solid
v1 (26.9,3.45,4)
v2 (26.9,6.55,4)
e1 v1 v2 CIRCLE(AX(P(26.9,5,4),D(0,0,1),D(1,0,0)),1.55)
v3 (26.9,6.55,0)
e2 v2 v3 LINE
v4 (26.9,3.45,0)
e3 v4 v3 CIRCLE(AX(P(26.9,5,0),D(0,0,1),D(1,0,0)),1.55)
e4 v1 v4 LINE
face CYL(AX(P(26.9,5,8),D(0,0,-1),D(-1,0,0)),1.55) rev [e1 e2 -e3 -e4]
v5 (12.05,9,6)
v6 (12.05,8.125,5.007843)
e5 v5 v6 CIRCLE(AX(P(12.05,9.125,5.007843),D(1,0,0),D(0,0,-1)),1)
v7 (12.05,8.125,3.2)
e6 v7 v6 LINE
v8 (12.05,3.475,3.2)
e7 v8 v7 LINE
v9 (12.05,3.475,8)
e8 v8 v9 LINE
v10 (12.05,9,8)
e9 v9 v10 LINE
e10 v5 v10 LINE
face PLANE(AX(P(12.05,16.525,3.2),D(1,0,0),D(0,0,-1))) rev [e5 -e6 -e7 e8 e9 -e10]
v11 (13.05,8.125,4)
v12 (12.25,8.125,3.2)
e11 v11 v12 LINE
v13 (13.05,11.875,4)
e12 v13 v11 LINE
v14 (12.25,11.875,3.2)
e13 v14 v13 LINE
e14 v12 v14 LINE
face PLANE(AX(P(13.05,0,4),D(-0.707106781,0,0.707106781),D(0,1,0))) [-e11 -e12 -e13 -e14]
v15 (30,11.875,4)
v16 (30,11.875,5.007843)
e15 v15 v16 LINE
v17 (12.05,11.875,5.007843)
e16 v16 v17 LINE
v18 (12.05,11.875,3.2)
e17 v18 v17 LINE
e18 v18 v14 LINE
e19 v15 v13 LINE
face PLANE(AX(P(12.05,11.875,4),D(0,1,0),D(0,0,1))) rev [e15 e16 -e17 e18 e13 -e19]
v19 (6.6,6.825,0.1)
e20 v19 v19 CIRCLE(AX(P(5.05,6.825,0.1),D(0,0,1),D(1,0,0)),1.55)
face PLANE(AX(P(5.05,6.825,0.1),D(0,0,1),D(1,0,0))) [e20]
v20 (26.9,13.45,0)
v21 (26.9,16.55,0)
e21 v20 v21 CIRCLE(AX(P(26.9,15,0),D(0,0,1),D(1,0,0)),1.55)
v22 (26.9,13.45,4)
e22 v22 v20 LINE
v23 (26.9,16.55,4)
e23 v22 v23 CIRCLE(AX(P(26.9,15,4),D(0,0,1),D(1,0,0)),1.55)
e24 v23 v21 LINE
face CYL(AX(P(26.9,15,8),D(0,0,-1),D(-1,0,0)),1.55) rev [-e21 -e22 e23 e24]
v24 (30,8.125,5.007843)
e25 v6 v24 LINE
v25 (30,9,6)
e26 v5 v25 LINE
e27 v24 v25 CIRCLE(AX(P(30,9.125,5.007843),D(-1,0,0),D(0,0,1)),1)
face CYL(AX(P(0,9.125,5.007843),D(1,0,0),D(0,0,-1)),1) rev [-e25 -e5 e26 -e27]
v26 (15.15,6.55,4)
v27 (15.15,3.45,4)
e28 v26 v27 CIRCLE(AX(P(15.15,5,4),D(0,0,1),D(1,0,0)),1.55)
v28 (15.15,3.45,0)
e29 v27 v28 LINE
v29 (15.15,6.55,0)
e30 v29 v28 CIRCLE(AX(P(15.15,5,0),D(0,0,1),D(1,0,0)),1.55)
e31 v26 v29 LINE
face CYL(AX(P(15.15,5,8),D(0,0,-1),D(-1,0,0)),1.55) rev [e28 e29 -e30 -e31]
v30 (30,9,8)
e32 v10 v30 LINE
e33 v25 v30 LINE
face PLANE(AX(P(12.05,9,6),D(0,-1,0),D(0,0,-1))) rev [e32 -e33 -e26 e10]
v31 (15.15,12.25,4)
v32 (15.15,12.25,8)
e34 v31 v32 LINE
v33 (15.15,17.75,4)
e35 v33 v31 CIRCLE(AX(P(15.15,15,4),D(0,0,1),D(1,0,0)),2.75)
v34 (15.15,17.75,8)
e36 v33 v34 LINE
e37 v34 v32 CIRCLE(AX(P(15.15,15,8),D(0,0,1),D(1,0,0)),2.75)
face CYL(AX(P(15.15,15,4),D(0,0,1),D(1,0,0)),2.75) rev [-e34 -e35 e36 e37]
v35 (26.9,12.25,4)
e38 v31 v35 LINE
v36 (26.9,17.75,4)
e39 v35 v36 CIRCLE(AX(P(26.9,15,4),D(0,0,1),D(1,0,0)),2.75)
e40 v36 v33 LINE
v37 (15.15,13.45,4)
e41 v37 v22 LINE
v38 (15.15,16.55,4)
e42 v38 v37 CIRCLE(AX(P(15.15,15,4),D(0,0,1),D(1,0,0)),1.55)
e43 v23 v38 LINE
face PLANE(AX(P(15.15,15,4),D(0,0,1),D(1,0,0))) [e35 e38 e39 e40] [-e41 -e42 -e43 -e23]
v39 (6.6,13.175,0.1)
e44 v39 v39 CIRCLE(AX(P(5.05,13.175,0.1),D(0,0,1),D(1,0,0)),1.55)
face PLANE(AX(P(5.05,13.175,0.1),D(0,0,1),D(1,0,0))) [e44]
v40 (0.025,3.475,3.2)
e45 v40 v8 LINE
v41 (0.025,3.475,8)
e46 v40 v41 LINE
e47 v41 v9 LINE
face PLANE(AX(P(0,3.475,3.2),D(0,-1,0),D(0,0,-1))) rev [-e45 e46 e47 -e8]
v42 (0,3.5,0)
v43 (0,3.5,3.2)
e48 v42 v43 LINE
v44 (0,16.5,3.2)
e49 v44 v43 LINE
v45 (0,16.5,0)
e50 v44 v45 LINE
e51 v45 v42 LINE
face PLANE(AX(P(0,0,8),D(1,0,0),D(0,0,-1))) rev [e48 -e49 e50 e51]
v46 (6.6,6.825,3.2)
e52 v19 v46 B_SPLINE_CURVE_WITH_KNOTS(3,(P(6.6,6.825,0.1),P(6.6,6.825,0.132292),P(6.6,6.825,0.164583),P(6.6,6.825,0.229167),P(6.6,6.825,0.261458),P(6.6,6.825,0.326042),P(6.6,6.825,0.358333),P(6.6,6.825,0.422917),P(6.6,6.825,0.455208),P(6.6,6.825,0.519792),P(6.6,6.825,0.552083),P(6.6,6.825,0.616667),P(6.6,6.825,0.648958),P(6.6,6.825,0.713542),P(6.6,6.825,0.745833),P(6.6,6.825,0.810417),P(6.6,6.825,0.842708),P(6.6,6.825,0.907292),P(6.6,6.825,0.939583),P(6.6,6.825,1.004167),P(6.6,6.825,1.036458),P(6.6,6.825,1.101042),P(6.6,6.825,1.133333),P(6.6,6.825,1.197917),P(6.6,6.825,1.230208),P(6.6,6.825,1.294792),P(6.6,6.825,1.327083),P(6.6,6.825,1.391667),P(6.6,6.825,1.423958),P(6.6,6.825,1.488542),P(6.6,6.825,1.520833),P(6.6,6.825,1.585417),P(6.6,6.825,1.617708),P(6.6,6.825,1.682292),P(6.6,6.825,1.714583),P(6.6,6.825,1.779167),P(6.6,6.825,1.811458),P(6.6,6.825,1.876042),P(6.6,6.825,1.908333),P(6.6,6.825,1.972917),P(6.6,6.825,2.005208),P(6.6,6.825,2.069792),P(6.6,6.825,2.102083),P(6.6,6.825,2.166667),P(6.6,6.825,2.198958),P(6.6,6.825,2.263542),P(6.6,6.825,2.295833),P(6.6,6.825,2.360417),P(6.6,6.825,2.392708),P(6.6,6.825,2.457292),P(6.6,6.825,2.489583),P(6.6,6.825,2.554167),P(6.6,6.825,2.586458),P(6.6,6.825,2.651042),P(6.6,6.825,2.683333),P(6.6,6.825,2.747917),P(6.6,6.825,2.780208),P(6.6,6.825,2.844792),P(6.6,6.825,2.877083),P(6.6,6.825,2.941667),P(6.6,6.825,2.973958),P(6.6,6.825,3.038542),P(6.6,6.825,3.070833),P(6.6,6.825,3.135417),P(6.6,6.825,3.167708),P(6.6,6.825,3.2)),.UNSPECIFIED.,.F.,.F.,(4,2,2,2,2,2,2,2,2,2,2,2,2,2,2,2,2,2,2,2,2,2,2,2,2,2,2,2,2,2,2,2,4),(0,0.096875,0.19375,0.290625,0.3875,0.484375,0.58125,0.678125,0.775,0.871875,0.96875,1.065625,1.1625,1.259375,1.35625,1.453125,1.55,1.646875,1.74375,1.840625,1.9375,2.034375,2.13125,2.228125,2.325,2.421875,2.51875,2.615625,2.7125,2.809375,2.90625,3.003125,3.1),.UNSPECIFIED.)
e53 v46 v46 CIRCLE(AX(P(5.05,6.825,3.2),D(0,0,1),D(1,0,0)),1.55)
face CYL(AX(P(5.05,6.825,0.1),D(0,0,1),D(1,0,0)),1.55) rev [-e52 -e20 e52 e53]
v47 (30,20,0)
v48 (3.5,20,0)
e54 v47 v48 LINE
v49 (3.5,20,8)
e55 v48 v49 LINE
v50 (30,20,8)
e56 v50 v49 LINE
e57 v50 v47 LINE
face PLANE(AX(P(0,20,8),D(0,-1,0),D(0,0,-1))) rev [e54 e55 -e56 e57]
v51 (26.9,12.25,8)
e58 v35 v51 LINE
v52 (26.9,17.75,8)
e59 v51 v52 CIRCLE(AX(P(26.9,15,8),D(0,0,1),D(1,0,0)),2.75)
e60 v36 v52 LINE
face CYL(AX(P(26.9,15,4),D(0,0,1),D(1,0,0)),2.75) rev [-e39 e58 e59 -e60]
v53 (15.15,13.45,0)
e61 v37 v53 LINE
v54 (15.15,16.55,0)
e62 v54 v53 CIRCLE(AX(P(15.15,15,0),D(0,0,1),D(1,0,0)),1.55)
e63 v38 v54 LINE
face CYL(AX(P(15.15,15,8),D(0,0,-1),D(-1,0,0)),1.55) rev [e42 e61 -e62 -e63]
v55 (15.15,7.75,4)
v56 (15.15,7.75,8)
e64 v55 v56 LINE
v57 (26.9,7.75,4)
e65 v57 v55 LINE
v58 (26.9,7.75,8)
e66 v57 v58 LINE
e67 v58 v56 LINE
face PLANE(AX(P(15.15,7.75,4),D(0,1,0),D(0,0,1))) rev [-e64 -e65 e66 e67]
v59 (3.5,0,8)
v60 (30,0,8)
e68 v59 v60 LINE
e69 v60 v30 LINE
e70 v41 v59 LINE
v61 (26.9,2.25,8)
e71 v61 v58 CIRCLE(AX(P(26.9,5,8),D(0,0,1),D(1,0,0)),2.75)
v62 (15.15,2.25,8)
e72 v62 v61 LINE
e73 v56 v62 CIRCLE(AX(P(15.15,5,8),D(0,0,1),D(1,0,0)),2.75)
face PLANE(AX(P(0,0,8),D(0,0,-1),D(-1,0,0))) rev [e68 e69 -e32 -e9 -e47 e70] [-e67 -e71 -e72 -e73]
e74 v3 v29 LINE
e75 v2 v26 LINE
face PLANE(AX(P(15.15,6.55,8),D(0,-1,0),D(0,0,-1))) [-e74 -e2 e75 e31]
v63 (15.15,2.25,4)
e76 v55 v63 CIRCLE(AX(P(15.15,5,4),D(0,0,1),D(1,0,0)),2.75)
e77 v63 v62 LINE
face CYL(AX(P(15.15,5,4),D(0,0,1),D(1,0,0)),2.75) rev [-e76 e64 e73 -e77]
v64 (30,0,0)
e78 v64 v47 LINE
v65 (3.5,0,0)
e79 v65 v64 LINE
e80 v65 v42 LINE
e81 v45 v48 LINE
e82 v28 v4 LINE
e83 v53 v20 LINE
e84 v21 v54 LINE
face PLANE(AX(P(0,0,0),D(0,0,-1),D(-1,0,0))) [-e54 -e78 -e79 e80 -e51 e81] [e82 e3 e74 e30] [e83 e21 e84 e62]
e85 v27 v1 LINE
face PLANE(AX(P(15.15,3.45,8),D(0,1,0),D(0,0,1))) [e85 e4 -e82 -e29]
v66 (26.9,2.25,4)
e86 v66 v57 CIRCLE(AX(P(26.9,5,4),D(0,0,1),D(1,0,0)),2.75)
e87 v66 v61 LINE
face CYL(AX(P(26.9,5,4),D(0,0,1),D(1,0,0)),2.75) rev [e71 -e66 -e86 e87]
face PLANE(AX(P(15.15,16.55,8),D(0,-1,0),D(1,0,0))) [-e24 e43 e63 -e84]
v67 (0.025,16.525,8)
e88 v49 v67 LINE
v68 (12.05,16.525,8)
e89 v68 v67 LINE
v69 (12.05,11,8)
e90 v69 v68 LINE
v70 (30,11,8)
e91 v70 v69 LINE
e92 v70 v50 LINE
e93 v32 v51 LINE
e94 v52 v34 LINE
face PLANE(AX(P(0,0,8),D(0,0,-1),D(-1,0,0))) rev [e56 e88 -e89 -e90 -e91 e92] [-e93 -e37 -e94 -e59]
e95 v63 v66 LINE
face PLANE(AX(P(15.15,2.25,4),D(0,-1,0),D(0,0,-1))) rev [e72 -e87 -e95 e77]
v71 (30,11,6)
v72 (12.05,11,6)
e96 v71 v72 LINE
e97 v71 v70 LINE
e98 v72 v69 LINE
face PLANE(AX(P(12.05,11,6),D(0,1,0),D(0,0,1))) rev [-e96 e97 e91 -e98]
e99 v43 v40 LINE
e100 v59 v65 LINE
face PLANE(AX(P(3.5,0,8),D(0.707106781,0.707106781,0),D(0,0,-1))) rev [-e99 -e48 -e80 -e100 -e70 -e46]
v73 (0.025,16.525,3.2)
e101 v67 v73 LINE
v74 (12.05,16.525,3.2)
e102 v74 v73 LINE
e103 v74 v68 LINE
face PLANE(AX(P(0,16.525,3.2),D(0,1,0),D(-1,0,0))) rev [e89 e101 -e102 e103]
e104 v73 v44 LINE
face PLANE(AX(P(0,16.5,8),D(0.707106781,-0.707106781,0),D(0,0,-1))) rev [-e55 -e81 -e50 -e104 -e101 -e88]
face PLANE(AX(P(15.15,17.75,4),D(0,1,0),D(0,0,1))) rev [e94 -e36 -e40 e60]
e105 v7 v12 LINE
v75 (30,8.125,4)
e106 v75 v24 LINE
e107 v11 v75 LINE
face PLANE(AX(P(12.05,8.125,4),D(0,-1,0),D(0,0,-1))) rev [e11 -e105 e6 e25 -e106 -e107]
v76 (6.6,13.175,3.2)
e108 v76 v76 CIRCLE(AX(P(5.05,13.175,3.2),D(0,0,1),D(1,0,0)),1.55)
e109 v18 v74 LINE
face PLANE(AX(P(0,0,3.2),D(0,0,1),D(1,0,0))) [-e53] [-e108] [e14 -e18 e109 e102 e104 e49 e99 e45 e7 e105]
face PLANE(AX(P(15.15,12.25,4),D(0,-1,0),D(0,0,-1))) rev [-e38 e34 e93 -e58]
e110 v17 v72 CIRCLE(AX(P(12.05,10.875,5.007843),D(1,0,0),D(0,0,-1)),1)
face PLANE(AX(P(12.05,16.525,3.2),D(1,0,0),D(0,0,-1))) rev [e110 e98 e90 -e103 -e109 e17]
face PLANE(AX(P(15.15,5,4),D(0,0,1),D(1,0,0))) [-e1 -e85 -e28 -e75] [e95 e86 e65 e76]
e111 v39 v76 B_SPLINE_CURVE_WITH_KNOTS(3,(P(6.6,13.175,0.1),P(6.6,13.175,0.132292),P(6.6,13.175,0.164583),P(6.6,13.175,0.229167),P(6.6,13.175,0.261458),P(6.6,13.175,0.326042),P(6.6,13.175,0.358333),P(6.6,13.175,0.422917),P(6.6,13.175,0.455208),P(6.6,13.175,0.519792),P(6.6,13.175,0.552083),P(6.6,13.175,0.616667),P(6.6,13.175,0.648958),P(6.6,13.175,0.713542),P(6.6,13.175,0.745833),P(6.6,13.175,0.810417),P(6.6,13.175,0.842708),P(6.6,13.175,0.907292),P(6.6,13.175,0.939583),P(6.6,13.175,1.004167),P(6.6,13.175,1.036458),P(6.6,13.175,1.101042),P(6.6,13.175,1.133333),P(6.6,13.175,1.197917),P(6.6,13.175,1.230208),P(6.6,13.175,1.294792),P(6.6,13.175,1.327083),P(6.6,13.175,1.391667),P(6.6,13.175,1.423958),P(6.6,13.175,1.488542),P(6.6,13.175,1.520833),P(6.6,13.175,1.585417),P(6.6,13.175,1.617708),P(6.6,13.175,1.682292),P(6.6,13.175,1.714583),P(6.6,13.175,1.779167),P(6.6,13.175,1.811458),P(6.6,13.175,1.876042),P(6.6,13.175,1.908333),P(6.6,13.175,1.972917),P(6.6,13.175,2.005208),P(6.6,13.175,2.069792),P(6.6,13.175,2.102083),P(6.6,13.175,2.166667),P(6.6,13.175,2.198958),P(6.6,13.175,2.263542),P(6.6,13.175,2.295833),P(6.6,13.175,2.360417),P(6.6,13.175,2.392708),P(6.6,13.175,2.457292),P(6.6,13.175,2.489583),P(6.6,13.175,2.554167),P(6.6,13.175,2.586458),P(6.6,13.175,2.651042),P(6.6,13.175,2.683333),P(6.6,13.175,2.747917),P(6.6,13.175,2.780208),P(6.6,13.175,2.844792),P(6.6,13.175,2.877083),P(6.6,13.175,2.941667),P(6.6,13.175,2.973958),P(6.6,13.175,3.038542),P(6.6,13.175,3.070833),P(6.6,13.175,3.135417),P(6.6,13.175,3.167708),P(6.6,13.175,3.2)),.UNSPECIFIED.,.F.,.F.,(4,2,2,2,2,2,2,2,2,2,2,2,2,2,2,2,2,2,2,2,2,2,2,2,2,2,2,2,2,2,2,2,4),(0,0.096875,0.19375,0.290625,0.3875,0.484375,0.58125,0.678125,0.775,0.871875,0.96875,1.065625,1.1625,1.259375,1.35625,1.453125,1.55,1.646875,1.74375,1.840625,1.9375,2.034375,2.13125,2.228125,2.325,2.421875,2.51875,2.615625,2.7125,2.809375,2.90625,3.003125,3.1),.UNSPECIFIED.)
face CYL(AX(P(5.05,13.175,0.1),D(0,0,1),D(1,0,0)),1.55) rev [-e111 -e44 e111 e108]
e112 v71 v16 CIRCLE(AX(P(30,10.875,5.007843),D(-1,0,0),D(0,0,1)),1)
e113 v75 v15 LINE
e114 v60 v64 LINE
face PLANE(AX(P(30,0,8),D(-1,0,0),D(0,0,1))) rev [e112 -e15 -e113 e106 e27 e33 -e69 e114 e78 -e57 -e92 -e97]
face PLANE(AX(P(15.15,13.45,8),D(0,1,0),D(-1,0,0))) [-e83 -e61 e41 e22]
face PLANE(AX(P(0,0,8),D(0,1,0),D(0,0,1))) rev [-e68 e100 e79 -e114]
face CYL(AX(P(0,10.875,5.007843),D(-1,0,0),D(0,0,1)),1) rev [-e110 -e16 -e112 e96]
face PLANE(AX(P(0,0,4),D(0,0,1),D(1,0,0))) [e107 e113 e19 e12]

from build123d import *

# Parameters (mm, degrees)
PROFILESKETCH3_W                           = 30
PROFILESKETCH3_H                           = 20
PROFILEBOSS_EXTRUDE1_DEPTH                 = 8
MICROSWITCHCUTSKETCH4_W                    = 12.05
MICROSWITCHCUTSKETCH4_H                    = 13.05
MICROSWITCHCUT_EXTRUDE1_DEPTH              = 4.8
SKETCH5_R                                  = 1.55
MICROSWITCHMOUNTINGHOLESCUT_EXTRUDE2_DEPTH = 3.1
SMALLCHANNELCABLESKETCH6_W                 = 17.95
SMALLCHANNELCABLESKETCH6_H                 = 2
SMALLCHANNELCABLECUT_EXTRUDE3_DEPTH        = 2
LARGECHANNELCABLESKETCH7_W                 = 17.95
LARGECHANNELCABLESKETCH7_H                 = 3.75
LARGECHANNELCABLECUT_EXTRUDE4_DEPTH        = 2
CHAMFER1_SIZE                              = 1
MOUNTSLOTBORECUT_EXTRUDE1_DEPTH            = 4
CHAMFER2_SIZE                              = 3.5
FILLET3_R                                  = 1


with BuildPart() as part:
    # ProfileSketch3 → ProfileBoss-Extrude1 (new body)
    with BuildSketch(Plane.XY):
        with Locations((15, 10)):
            Rectangle(PROFILESKETCH3_W, PROFILESKETCH3_H)
        with BuildLine():
            Line((15.15, 16.55), (26.9, 16.55))
            ThreePointArc((26.9, 16.55), (28.45, 15), (26.9, 13.45))
            Line((26.9, 13.45), (15.15, 13.45))
            ThreePointArc((15.15, 13.45), (13.6, 15), (15.15, 16.55))
        make_face(mode=Mode.SUBTRACT)
        with BuildLine():
            Line((15.15, 6.55), (26.9, 6.55))
            ThreePointArc((26.9, 6.55), (28.45, 5), (26.9, 3.45))
            Line((26.9, 3.45), (15.15, 3.45))
            ThreePointArc((15.15, 3.45), (13.6, 5), (15.15, 6.55))
        make_face(mode=Mode.SUBTRACT)
    extrude(amount=PROFILEBOSS_EXTRUDE1_DEPTH)

    # MicroSwitchCutSketch4 → MicroSwitchCut-Extrude1 (cut)
    with BuildSketch(Plane.XY.offset(8)):
        with Locations((6.025, 10)):
            Rectangle(MICROSWITCHCUTSKETCH4_W, MICROSWITCHCUTSKETCH4_H)
    extrude(amount=-MICROSWITCHCUT_EXTRUDE1_DEPTH, mode=Mode.SUBTRACT)

    # Sketch5 → MicroSwitchMountingHolesCut-Extrude2 (cut)
    with BuildSketch(Plane.XY.offset(3.2)):
        with Locations((5.05, 13.175)):
            Circle(SKETCH5_R)
        with Locations((5.05, 6.825)):
            Circle(SKETCH5_R)
    extrude(amount=-MICROSWITCHMOUNTINGHOLESCUT_EXTRUDE2_DEPTH, mode=Mode.SUBTRACT)

    # SmallChannelCableSketch6 → SmallChannelCableCut-Extrude3 (cut)
    with BuildSketch(Plane.XY.offset(8)):
        with Locations((21.025, 10)):
            Rectangle(SMALLCHANNELCABLESKETCH6_W, SMALLCHANNELCABLESKETCH6_H)
    extrude(amount=-SMALLCHANNELCABLECUT_EXTRUDE3_DEPTH, mode=Mode.SUBTRACT)

    # LargeChannelCableSketch7 → LargeChannelCableCut-Extrude4 (cut)
    with BuildSketch(Plane.XY.offset(6)):
        with Locations((21.025, 10)):
            Rectangle(LARGECHANNELCABLESKETCH7_W, LARGECHANNELCABLESKETCH7_H)
    extrude(amount=-LARGECHANNELCABLECUT_EXTRUDE4_DEPTH, mode=Mode.SUBTRACT)

    # Chamfer1
    # the kernel refuses this chamfer: 1 mm, written as the material it takes off along each edge
    with BuildSketch(Plane(origin=(12.05, 8.125, 4), x_dir=(0.9996219169112968, 0, 0.02749587661058651), z_dir=(0, 1, 0))) as chamfer1_piece_1_section:
        Polygon((CHAMFER1_SIZE * 0.999621916911, CHAMFER1_SIZE * 0.0274958766106), (-CHAMFER1_SIZE * 0.0274958766106, CHAMFER1_SIZE * 0.999621916911), (0, 0), align=None)
    chamfer1_piece_1 = extrude(amount=3.75, mode=Mode.PRIVATE)
    chamfer1_piece_1 = split(chamfer1_piece_1, bisect_by=Plane(origin=(12.395718412, 10, 3.2), z_dir=(0, 0, 1)), keep=Keep.TOP, mode=Mode.PRIVATE)
    add(chamfer1_piece_1, mode=Mode.SUBTRACT)

    # Sketch6 → MountSLotBoreCut-Extrude1 (cut)
    with BuildSketch(Plane.XY.offset(8)):
        with BuildLine():
            Line((15.15, 17.75), (26.9, 17.75))
            ThreePointArc((26.9, 17.75), (29.65, 15), (26.9, 12.25))
            Line((26.9, 12.25), (15.15, 12.25))
            ThreePointArc((15.15, 12.25), (12.4, 15), (15.15, 17.75))
        make_face()
        with BuildLine():
            Line((15.15, 7.75), (26.9, 7.75))
            ThreePointArc((26.9, 7.75), (29.65, 5), (26.9, 2.25))
            Line((26.9, 2.25), (15.15, 2.25))
            ThreePointArc((15.15, 2.25), (12.4, 5), (15.15, 7.75))
        make_face()
    extrude(amount=-MOUNTSLOTBORECUT_EXTRUDE1_DEPTH, mode=Mode.SUBTRACT)

    # Chamfer2
    chamfer2_edges = [part.edges().sort_by_distance(p)[0] for p in [
        (0, 20, 4),
        (0, 0, 4),
    ]]
    chamfer(chamfer2_edges, length=CHAMFER2_SIZE)

    # Fillet3
    # the kernel refuses this fillet: 1 mm, written as the material it adds along each edge
    with BuildSketch(Plane(origin=(12.05, 11.875, 6), x_dir=(0, 0, -1), z_dir=(1, 0, 0))) as fillet3_piece_1:
        with BuildLine():
            CenterArc((0.992156742, -1), FILLET3_R, 90, 82.819244219)
            Line((0, -0.875), (-0.019843135, -0.8725))
            ThreePointArc((-0.019843135, -0.8725), (-0.02, -0.4375), (-0.02, 0))
            Line((-0.02, 0), (0, 0.02))
            Line((0, 0.02), (0.992156742, 0.02))
            Line((0.992156742, 0.02), (0.992156742, 0))
        make_face()
    extrude(amount=17.95)
    with BuildSketch(Plane(origin=(30, 8.125, 6), x_dir=(0, 1, 0), z_dir=(-1, 0, 0))) as fillet3_piece_2:
        with BuildLine():
            CenterArc((1, 0.992156742), FILLET3_R, 180, 82.819244219)
            Line((0, 0.992156742), (-0.02, 0.992156742))
            Line((-0.02, 0.992156742), (-0.02, 0))
            Line((-0.02, 0), (0, -0.02))
            ThreePointArc((0, -0.02), (0.4375, -0.02), (0.8725, -0.019843135))
            Line((0.8725, -0.019843135), (0.875, 0))
        make_face()
    extrude(amount=17.95)


solid = part.part
